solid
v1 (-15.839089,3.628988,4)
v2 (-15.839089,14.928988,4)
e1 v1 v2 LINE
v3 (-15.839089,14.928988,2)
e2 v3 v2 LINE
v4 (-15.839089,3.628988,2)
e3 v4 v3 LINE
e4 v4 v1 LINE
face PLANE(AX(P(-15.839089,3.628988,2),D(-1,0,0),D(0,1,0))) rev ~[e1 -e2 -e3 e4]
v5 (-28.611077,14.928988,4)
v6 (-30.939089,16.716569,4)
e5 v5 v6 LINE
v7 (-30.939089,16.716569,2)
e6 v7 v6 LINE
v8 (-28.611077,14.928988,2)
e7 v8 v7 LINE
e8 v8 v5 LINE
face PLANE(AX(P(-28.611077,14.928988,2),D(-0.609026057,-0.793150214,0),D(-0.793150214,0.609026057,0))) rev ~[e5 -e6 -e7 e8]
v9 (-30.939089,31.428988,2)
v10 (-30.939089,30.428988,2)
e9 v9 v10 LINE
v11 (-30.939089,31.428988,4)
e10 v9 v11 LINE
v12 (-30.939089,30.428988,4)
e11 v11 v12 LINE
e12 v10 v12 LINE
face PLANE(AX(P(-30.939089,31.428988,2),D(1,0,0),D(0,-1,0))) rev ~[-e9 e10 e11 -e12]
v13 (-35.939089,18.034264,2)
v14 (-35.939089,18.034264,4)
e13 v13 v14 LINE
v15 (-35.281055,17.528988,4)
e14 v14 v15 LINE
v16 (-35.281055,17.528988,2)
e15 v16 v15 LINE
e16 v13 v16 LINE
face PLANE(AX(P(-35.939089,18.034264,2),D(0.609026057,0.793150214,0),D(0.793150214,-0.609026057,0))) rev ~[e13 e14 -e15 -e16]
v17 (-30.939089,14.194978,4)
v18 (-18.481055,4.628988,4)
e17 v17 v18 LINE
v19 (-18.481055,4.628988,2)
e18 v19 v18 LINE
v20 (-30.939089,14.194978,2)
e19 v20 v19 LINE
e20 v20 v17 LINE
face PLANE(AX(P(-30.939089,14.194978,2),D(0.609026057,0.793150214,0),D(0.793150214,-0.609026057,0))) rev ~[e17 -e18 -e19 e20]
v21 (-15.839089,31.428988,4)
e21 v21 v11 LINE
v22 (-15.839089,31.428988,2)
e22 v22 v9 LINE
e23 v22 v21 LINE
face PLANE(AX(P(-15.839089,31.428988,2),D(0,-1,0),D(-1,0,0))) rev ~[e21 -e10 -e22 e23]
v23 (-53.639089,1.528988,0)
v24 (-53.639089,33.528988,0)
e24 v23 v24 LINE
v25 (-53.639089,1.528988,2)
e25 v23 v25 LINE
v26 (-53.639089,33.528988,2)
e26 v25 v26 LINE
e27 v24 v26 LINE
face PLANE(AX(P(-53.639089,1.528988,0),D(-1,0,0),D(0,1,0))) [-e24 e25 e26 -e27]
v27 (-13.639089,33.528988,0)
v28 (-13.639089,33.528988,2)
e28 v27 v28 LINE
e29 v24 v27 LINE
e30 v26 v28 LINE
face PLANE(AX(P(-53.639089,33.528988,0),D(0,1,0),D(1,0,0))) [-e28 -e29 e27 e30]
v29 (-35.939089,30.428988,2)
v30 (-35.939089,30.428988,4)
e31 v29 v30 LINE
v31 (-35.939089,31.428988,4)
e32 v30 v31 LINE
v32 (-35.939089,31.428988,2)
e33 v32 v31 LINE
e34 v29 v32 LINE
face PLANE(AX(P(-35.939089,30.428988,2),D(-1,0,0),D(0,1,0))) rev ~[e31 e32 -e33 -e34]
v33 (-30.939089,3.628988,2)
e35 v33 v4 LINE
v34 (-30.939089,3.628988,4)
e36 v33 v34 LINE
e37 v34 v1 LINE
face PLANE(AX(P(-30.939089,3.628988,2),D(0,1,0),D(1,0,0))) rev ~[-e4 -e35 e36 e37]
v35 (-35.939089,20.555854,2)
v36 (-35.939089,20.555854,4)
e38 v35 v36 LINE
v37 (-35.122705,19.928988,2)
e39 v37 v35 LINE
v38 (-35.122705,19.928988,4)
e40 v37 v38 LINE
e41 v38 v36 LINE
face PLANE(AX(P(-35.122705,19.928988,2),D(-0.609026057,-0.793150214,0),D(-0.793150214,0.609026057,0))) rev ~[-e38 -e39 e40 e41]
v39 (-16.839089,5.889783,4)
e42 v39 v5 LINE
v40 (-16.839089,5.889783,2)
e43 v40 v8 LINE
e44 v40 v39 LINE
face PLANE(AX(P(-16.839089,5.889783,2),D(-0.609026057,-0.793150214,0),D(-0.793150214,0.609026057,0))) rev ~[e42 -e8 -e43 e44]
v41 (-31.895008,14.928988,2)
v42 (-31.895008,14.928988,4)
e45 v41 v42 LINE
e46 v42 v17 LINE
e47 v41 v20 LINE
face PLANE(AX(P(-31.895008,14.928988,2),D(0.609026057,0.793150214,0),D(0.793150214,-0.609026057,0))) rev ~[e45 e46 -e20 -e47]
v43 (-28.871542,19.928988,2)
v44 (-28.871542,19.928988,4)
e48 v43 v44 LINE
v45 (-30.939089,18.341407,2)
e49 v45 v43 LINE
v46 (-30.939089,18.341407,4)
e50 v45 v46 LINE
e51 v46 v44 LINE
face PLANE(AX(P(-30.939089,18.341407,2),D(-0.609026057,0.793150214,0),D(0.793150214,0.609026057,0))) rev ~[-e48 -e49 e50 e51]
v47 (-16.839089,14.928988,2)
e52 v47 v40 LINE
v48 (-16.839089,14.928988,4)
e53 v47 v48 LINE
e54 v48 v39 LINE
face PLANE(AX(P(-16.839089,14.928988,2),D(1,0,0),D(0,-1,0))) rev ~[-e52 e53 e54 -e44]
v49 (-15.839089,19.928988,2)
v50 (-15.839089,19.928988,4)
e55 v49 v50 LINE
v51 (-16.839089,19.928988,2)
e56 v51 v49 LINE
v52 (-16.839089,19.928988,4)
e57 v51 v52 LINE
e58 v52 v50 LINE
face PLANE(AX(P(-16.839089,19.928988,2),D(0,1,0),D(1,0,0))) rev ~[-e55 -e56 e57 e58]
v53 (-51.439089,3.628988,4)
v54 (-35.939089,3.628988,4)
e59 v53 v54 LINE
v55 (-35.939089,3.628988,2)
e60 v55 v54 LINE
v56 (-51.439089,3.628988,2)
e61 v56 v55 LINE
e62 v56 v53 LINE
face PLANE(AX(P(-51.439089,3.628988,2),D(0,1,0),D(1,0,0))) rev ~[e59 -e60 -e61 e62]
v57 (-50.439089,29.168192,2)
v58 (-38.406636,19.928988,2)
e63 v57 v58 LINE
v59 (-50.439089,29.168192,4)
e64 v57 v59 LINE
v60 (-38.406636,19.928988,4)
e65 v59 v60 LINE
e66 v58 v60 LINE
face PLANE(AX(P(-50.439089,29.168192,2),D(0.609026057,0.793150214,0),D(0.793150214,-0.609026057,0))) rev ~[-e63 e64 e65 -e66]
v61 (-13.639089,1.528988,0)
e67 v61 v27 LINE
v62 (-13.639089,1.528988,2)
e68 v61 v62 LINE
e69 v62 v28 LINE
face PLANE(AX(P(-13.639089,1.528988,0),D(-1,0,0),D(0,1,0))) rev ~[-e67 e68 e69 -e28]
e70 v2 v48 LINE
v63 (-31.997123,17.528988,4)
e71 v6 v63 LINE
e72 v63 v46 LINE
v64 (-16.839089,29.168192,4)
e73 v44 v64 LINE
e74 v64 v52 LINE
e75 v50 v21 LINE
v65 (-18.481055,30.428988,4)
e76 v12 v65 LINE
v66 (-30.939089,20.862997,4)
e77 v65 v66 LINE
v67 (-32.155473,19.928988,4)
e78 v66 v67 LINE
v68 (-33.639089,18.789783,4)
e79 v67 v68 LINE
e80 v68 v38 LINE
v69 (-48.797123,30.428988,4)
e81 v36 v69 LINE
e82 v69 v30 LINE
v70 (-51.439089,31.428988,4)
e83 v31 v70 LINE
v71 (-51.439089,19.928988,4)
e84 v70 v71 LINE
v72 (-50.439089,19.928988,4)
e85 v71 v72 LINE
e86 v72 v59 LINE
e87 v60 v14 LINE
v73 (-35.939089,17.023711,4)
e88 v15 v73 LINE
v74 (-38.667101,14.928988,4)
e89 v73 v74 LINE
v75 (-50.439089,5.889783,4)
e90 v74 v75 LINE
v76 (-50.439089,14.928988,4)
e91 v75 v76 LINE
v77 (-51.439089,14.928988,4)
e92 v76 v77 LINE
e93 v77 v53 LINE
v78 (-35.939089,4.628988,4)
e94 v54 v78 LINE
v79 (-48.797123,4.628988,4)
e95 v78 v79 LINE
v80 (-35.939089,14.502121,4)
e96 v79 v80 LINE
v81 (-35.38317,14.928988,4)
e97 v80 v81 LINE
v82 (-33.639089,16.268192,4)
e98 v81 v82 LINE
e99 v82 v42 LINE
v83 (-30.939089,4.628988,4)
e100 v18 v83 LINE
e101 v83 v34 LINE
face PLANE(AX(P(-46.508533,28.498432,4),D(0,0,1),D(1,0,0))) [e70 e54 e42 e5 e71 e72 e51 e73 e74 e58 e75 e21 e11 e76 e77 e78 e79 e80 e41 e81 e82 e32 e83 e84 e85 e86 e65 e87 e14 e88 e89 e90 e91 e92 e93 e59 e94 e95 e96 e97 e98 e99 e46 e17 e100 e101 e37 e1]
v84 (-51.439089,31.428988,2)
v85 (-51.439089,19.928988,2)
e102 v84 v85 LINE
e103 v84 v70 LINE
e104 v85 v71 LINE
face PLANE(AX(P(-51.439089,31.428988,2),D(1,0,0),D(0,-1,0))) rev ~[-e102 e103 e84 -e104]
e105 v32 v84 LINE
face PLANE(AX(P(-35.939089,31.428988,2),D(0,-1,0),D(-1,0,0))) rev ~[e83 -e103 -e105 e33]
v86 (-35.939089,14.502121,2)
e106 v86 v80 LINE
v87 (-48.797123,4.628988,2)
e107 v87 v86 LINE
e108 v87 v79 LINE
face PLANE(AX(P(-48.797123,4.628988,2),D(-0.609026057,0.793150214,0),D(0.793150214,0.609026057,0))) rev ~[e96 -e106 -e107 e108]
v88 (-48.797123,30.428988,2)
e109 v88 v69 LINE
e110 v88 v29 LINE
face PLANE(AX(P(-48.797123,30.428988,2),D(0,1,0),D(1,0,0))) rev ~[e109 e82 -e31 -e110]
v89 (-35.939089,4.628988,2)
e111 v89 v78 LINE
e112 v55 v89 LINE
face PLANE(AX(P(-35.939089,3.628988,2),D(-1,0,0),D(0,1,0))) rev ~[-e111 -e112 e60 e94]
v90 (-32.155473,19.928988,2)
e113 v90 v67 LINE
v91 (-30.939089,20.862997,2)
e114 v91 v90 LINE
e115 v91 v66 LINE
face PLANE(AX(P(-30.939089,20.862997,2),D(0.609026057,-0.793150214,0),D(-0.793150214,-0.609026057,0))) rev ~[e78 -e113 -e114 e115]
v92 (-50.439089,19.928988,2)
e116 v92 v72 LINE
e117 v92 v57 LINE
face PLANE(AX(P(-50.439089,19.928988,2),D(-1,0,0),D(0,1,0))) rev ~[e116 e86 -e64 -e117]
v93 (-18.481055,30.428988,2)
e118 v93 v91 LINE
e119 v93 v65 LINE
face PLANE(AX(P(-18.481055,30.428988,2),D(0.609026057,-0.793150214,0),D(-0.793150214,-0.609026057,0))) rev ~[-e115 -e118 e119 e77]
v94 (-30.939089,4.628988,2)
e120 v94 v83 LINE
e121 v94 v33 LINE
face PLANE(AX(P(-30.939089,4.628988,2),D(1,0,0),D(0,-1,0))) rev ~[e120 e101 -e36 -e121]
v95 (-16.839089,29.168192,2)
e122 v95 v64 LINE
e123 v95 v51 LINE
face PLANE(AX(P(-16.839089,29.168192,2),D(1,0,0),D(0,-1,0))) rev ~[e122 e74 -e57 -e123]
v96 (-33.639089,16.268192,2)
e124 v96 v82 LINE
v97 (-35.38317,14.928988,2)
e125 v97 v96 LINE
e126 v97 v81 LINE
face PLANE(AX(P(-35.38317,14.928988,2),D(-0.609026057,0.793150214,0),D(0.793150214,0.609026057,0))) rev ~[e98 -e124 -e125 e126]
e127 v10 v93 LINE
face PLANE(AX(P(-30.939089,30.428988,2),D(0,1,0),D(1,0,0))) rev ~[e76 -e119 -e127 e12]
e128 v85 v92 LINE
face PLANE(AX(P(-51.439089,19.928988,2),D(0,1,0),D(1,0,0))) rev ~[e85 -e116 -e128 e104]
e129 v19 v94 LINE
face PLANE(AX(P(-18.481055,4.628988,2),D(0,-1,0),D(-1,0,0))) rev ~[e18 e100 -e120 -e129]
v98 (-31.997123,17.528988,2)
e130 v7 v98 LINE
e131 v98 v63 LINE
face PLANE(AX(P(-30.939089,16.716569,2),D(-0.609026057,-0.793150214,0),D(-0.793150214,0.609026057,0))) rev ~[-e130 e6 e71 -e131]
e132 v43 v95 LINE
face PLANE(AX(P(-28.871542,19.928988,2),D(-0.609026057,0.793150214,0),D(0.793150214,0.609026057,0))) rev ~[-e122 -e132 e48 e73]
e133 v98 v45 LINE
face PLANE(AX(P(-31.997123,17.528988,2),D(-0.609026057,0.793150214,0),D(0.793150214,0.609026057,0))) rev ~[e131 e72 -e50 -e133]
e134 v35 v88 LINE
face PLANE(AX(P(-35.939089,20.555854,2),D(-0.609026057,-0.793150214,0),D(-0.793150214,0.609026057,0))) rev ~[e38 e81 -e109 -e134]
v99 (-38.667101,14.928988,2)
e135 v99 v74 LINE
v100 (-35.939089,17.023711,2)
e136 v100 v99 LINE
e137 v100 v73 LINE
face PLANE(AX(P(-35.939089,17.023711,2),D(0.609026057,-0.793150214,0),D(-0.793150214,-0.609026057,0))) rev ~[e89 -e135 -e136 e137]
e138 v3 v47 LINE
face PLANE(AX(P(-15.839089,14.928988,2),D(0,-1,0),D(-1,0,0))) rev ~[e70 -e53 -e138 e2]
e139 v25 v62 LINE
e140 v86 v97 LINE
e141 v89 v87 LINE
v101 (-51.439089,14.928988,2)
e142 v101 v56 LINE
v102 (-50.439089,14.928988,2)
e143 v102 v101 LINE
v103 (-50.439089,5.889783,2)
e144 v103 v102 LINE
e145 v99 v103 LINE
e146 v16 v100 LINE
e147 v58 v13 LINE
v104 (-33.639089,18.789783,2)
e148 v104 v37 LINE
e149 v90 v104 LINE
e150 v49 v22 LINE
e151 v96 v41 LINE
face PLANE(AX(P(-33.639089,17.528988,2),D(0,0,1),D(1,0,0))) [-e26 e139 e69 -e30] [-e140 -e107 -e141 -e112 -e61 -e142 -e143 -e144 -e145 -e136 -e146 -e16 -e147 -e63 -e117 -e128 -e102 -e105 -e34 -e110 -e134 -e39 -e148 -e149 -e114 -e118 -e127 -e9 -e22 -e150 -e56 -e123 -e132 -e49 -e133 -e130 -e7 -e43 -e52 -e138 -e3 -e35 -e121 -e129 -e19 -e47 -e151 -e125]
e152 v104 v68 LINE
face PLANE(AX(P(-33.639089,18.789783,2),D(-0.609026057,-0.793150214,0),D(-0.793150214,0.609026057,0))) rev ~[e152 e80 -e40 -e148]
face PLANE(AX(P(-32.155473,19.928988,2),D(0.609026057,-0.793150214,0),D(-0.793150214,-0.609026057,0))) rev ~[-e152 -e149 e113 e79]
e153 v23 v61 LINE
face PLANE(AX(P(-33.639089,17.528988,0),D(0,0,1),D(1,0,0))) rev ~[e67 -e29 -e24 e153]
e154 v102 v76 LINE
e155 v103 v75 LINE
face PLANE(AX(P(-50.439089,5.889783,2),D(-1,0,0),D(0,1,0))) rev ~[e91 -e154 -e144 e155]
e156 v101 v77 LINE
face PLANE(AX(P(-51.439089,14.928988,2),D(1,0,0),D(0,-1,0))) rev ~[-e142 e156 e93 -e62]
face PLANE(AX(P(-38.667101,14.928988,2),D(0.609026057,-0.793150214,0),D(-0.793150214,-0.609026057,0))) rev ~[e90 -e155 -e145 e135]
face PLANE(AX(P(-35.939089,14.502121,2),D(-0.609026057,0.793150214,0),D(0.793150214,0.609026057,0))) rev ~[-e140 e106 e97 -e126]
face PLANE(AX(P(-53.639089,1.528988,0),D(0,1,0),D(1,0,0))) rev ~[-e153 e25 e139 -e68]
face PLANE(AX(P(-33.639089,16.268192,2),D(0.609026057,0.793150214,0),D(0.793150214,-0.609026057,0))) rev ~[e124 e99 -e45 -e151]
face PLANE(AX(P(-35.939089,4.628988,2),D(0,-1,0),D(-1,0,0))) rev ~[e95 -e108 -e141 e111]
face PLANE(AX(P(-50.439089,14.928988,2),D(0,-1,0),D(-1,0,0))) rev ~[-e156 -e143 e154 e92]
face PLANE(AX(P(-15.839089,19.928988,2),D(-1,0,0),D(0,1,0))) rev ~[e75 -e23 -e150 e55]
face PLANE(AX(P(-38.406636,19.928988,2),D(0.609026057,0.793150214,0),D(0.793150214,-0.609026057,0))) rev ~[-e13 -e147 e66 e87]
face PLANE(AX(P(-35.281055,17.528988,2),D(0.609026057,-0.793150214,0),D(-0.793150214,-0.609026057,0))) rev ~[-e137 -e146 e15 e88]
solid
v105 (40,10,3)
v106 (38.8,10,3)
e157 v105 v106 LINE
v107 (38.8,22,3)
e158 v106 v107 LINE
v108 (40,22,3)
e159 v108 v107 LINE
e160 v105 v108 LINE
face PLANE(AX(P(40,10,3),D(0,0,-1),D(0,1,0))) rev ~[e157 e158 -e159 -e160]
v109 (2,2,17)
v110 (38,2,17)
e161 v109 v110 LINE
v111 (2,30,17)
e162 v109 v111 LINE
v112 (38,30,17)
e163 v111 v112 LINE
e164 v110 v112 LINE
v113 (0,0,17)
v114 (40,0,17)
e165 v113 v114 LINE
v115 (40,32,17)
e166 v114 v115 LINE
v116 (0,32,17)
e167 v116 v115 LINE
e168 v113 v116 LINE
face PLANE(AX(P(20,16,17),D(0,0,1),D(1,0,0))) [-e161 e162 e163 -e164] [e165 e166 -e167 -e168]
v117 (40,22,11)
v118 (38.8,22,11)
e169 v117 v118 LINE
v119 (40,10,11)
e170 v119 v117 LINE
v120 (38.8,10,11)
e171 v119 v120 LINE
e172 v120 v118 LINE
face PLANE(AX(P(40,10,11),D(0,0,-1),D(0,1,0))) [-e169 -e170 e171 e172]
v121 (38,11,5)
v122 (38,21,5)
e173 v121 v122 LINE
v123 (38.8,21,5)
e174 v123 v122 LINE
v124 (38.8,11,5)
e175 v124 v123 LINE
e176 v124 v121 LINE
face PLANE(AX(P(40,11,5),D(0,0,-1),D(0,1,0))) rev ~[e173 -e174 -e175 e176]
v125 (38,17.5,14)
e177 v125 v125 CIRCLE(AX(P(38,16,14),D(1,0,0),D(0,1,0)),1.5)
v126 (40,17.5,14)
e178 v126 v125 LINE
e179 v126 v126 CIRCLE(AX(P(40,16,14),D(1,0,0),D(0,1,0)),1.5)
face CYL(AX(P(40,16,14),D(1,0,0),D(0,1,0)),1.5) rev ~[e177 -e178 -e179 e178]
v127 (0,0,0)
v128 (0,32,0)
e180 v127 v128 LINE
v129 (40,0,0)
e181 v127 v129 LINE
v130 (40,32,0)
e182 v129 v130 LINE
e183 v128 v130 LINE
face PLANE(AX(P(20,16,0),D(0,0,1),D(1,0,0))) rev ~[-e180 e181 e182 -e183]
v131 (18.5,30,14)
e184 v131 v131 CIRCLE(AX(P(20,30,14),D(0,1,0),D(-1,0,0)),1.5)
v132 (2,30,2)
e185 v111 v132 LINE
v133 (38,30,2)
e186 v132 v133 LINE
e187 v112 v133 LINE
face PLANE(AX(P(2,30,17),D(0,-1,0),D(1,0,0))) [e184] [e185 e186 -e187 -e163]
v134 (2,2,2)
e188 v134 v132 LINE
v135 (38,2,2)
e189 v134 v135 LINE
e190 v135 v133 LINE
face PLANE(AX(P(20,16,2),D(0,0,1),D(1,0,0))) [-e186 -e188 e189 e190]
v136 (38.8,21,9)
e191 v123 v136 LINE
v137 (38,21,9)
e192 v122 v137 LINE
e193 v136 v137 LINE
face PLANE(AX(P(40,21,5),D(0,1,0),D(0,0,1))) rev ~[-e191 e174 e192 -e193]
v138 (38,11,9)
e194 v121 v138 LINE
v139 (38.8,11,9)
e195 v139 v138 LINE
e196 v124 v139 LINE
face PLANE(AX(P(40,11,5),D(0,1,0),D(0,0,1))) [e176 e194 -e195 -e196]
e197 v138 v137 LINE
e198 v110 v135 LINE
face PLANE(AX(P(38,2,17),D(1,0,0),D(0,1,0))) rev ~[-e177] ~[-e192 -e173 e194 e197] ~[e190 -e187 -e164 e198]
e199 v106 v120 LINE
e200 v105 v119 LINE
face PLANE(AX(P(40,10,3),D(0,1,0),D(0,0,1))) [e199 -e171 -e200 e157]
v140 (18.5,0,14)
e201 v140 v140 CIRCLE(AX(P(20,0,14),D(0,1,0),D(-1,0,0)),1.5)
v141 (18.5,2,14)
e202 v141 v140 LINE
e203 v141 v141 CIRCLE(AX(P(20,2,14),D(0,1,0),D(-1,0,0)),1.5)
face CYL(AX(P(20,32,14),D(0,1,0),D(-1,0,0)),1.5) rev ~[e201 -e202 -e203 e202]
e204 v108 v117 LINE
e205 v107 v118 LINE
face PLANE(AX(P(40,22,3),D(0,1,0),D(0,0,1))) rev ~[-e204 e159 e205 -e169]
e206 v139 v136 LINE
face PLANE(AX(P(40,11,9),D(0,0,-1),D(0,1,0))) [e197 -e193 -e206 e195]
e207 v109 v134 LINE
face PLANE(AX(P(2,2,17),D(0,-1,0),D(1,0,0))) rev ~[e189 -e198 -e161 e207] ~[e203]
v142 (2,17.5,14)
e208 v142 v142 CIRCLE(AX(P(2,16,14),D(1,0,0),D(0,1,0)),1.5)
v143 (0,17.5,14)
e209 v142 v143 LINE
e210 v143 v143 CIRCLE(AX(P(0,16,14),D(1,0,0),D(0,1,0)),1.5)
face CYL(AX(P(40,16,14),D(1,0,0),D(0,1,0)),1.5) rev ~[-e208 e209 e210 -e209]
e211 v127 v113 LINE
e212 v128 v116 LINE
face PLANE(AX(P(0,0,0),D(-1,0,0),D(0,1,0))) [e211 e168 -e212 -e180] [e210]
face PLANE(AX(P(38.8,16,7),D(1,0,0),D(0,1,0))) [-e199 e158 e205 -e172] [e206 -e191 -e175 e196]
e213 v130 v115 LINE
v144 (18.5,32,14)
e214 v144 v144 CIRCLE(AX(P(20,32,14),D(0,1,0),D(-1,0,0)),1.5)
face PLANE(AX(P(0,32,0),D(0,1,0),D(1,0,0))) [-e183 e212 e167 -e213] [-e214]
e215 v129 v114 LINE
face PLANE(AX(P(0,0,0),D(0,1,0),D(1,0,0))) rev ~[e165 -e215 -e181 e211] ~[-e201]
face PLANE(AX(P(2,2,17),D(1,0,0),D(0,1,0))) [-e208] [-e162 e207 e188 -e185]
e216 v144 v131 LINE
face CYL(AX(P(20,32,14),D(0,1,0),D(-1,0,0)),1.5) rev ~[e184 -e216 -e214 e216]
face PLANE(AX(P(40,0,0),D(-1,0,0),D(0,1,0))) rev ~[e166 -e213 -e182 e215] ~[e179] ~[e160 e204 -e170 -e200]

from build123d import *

# Parameters (mm, degrees)
F0_W      = 40
F0_H      = 32
F1_DEPTH  = 17
F2_W      = 36
F2_H      = 28
F3_DEPTH  = 15
F4_R      = 1.5
F5_DEPTH  = 40.001
F6_R      = 1.5
F7_DEPTH  = 32.001
F4_W      = 10
F4_H      = 4
F8_DEPTH  = 2
F9_W      = 40
F9_H      = 32
F10_DEPTH = 2
F12_DEPTH = 2
F4_W_2    = 12
F4_H_2    = 8
F13_DEPTH = 1.2


with BuildPart() as f1:
    # F0 (on Top) → F1 (new body)
    with BuildSketch(Plane.XY):
        with Locations((20, 16)):
            Rectangle(F0_W, F0_H)
    extrude(amount=F1_DEPTH)

    # F2 (on face) → F3 (cut)
    with BuildSketch(Plane.XY.offset(17)):
        with Locations((20, 16)):
            Rectangle(F2_W, F2_H)
    extrude(amount=-F3_DEPTH, mode=Mode.SUBTRACT)

    # F4 (on face) → F5 (cut, through all)
    with BuildSketch(Plane.YZ.offset(40)):
        with Locations((16, 14)):
            Circle(F4_R)
    extrude(amount=-F5_DEPTH, mode=Mode.SUBTRACT)

    # F6 (on face) → F7 (cut, through all)
    with BuildSketch(Plane(origin=(0, 32, 0), x_dir=(-1, 0, 0), z_dir=(0, 1, 0))):
        with Locations((-20, 14)):
            Circle(F6_R)
    extrude(amount=-F7_DEPTH, mode=Mode.SUBTRACT)

    # F4 (on face) → F8 (cut, through all)
    with BuildSketch(Plane.YZ.offset(40)):
        with Locations((16, 7)):
            Rectangle(F4_W, F4_H)
    extrude(amount=-F8_DEPTH, mode=Mode.SUBTRACT)

    # F4 (on face) → F13 (cut)
    with BuildSketch(Plane.YZ.offset(40)):
        with Locations((16, 7)):
            Rectangle(F4_W_2, F4_H_2)
        with Locations((16, 7)):
            Rectangle(F4_W, F4_H, mode=Mode.SUBTRACT)
    extrude(amount=-F13_DEPTH, mode=Mode.SUBTRACT)


with BuildPart() as f10:
    # F9 (on Top) → F10 (new body)
    with BuildSketch(Plane.XY):
        with Locations((-33.6390890081, 17.5289876275)):
            Rectangle(F9_W, F9_H)
    extrude(amount=F10_DEPTH)

    # F11 (on face) → F12 (join)
    with BuildSketch(Plane.XY.offset(2)):
        Polygon((-35.9390890081, 31.4289876275), (-51.4390890081, 31.4289876275), (-51.4390890081, 19.9289876275), (-50.4390890081, 19.9289876275), (-50.4390890081, 29.1681924055), (-50.4390890081, 30.4289876275), (-48.7971231376, 30.4289876275), (-35.9390890081, 30.4289876275), align=None)
        Polygon((-15.8390890081, 31.4289876275), (-30.9390890081, 31.4289876275), (-30.9390890081, 30.4289876275), (-18.4810548786, 30.4289876275), (-16.8390890081, 30.4289876275), (-16.8390890081, 29.1681924055), (-16.8390890081, 19.9289876275), (-15.8390890081, 19.9289876275), align=None)
        Polygon((-50.4390890081, 30.4289876275), (-50.4390890081, 29.1681924055), (-38.406636274, 19.9289876275), (-36.7646704035, 19.9289876275), align=None)
        Polygon((-35.9390890081, 20.5558542781), (-48.7971231376, 30.4289876275), (-50.4390890081, 30.4289876275), (-36.7646704035, 19.9289876275), (-35.9390890081, 19.9289876275), align=None)
        Polygon((-32.8181060728, 18.1593852385), (-33.6390890081, 18.7897828495), (-34.4600719434, 18.1593852385), (-33.6390890081, 17.5289876275), align=None)
        Polygon((-31.9971231376, 17.5289876275), (-32.8181060728, 18.1593852385), (-33.6390890081, 17.5289876275), (-32.8181060728, 16.8985900165), align=None)
        Polygon((-34.4600719434, 18.1593852385), (-35.2810548786, 17.5289876275), (-34.4600719434, 16.8985900165), (-33.6390890081, 17.5289876275), align=None)
        Polygon((-33.6390890081, 17.5289876275), (-34.4600719434, 16.8985900165), (-33.6390890081, 16.2681924055), (-32.8181060728, 16.8985900165), align=None)
        Polygon((-30.9390890081, 18.3414066912), (-30.9390890081, 19.6022019132), (-32.8181060728, 18.1593852385), (-31.9971231376, 17.5289876275), align=None)
        Polygon((-30.9390890081, 19.9289876275), (-32.1554734833, 19.9289876275), (-33.6390890081, 18.7897828495), (-32.8181060728, 18.1593852385), (-30.9390890081, 19.6022019132), align=None)
        Polygon((-35.2810548786, 17.5289876275), (-35.9390890081, 17.0237114209), (-35.9390890081, 15.7629161989), (-34.4600719434, 16.8985900165), align=None)
        Polygon((-34.4600719434, 16.8985900165), (-35.9390890081, 15.7629161989), (-35.9390890081, 14.9289876275), (-35.3831696492, 14.9289876275), (-33.6390890081, 16.2681924055), align=None)
        Polygon((-30.9390890081, 14.1949781198), (-18.4810548786, 4.6289876275), (-16.8390890081, 4.6289876275), (-30.2530424965, 14.9289876275), (-30.9390890081, 14.9289876275), align=None)
        Polygon((-16.8390890081, 4.6289876275), (-16.8390890081, 5.8897828495), (-28.611076626, 14.9289876275), (-30.2530424965, 14.9289876275), align=None)
        Polygon((-35.9390890081, 17.0237114209), (-38.6671013903, 14.9289876275), (-37.0251355197, 14.9289876275), (-35.9390890081, 15.7629161989), align=None)
        Polygon((-36.7646704035, 19.9289876275), (-38.406636274, 19.9289876275), (-35.9390890081, 18.034263834), (-35.9390890081, 19.295059056), align=None)
        Polygon((-35.9390890081, 19.295059056), (-35.9390890081, 18.034263834), (-35.2810548786, 17.5289876275), (-34.4600719434, 18.1593852385), align=None)
        Polygon((-33.6390890081, 18.7897828495), (-35.1227045329, 19.9289876275), (-35.9390890081, 19.9289876275), (-35.9390890081, 19.295059056), (-34.4600719434, 18.1593852385), align=None)
        Polygon((-35.1227045329, 19.9289876275), (-35.9390890081, 20.5558542781), (-35.9390890081, 19.9289876275), align=None)
        Polygon((-35.9390890081, 15.7629161989), (-37.0251355197, 14.9289876275), (-35.9390890081, 14.9289876275), align=None)
        Polygon((-32.8181060728, 16.8985900165), (-33.6390890081, 16.2681924055), (-31.895008367, 14.9289876275), (-30.9390890081, 14.9289876275), (-30.9390890081, 15.4557733418), align=None)
        Polygon((-30.9390890081, 16.7165685638), (-31.9971231376, 17.5289876275), (-32.8181060728, 16.8985900165), (-30.9390890081, 15.4557733418), align=None)
        Polygon((-30.2530424965, 14.9289876275), (-28.611076626, 14.9289876275), (-30.9390890081, 16.7165685638), (-30.9390890081, 15.4557733418), align=None)
        Polygon((-30.9390890081, 14.9289876275), (-30.2530424965, 14.9289876275), (-30.9390890081, 15.4557733418), align=None)
        Polygon((-31.895008367, 14.9289876275), (-30.9390890081, 14.1949781198), (-30.9390890081, 14.9289876275), align=None)
        Polygon((-35.9390890081, 19.295059056), (-35.9390890081, 19.9289876275), (-36.7646704035, 19.9289876275), align=None)
        Polygon((-30.9390890081, 18.3414066912), (-28.8715417422, 19.9289876275), (-30.5135076128, 19.9289876275), (-30.9390890081, 19.6022019132), align=None)
        Polygon((-30.5135076128, 19.9289876275), (-30.9390890081, 19.9289876275), (-30.9390890081, 19.6022019132), align=None)
        Polygon((-30.9390890081, 19.9289876275), (-30.9390890081, 20.8629971352), (-32.1554734833, 19.9289876275), align=None)
        Polygon((-16.8390890081, 30.4289876275), (-18.4810548786, 30.4289876275), (-30.9390890081, 20.8629971352), (-30.9390890081, 19.9289876275), (-30.5135076128, 19.9289876275), align=None)
        Polygon((-16.8390890081, 29.1681924055), (-16.8390890081, 30.4289876275), (-30.5135076128, 19.9289876275), (-28.8715417422, 19.9289876275), align=None)
        Polygon((-37.0251355197, 14.9289876275), (-50.4390890081, 4.6289876275), (-48.7971231376, 4.6289876275), (-35.9390890081, 14.5021209769), (-35.9390890081, 14.9289876275), align=None)
        Polygon((-38.6671013903, 14.9289876275), (-50.4390890081, 5.8897828495), (-50.4390890081, 4.6289876275), (-37.0251355197, 14.9289876275), align=None)
        Polygon((-50.4390890081, 14.9289876275), (-51.4390890081, 14.9289876275), (-51.4390890081, 3.6289876275), (-35.9390890081, 3.6289876275), (-35.9390890081, 4.6289876275), (-48.7971231376, 4.6289876275), (-50.4390890081, 4.6289876275), (-50.4390890081, 5.8897828495), align=None)
        Polygon((-15.8390890081, 3.6289876275), (-15.8390890081, 14.9289876275), (-16.8390890081, 14.9289876275), (-16.8390890081, 5.8897828495), (-16.8390890081, 4.6289876275), (-18.4810548786, 4.6289876275), (-30.9390890081, 4.6289876275), (-30.9390890081, 3.6289876275), align=None)
        Polygon((-35.9390890081, 14.9289876275), (-35.9390890081, 14.5021209769), (-35.3831696492, 14.9289876275), align=None)
    extrude(amount=F12_DEPTH)


solid = Compound([f1.part, f10.part])
